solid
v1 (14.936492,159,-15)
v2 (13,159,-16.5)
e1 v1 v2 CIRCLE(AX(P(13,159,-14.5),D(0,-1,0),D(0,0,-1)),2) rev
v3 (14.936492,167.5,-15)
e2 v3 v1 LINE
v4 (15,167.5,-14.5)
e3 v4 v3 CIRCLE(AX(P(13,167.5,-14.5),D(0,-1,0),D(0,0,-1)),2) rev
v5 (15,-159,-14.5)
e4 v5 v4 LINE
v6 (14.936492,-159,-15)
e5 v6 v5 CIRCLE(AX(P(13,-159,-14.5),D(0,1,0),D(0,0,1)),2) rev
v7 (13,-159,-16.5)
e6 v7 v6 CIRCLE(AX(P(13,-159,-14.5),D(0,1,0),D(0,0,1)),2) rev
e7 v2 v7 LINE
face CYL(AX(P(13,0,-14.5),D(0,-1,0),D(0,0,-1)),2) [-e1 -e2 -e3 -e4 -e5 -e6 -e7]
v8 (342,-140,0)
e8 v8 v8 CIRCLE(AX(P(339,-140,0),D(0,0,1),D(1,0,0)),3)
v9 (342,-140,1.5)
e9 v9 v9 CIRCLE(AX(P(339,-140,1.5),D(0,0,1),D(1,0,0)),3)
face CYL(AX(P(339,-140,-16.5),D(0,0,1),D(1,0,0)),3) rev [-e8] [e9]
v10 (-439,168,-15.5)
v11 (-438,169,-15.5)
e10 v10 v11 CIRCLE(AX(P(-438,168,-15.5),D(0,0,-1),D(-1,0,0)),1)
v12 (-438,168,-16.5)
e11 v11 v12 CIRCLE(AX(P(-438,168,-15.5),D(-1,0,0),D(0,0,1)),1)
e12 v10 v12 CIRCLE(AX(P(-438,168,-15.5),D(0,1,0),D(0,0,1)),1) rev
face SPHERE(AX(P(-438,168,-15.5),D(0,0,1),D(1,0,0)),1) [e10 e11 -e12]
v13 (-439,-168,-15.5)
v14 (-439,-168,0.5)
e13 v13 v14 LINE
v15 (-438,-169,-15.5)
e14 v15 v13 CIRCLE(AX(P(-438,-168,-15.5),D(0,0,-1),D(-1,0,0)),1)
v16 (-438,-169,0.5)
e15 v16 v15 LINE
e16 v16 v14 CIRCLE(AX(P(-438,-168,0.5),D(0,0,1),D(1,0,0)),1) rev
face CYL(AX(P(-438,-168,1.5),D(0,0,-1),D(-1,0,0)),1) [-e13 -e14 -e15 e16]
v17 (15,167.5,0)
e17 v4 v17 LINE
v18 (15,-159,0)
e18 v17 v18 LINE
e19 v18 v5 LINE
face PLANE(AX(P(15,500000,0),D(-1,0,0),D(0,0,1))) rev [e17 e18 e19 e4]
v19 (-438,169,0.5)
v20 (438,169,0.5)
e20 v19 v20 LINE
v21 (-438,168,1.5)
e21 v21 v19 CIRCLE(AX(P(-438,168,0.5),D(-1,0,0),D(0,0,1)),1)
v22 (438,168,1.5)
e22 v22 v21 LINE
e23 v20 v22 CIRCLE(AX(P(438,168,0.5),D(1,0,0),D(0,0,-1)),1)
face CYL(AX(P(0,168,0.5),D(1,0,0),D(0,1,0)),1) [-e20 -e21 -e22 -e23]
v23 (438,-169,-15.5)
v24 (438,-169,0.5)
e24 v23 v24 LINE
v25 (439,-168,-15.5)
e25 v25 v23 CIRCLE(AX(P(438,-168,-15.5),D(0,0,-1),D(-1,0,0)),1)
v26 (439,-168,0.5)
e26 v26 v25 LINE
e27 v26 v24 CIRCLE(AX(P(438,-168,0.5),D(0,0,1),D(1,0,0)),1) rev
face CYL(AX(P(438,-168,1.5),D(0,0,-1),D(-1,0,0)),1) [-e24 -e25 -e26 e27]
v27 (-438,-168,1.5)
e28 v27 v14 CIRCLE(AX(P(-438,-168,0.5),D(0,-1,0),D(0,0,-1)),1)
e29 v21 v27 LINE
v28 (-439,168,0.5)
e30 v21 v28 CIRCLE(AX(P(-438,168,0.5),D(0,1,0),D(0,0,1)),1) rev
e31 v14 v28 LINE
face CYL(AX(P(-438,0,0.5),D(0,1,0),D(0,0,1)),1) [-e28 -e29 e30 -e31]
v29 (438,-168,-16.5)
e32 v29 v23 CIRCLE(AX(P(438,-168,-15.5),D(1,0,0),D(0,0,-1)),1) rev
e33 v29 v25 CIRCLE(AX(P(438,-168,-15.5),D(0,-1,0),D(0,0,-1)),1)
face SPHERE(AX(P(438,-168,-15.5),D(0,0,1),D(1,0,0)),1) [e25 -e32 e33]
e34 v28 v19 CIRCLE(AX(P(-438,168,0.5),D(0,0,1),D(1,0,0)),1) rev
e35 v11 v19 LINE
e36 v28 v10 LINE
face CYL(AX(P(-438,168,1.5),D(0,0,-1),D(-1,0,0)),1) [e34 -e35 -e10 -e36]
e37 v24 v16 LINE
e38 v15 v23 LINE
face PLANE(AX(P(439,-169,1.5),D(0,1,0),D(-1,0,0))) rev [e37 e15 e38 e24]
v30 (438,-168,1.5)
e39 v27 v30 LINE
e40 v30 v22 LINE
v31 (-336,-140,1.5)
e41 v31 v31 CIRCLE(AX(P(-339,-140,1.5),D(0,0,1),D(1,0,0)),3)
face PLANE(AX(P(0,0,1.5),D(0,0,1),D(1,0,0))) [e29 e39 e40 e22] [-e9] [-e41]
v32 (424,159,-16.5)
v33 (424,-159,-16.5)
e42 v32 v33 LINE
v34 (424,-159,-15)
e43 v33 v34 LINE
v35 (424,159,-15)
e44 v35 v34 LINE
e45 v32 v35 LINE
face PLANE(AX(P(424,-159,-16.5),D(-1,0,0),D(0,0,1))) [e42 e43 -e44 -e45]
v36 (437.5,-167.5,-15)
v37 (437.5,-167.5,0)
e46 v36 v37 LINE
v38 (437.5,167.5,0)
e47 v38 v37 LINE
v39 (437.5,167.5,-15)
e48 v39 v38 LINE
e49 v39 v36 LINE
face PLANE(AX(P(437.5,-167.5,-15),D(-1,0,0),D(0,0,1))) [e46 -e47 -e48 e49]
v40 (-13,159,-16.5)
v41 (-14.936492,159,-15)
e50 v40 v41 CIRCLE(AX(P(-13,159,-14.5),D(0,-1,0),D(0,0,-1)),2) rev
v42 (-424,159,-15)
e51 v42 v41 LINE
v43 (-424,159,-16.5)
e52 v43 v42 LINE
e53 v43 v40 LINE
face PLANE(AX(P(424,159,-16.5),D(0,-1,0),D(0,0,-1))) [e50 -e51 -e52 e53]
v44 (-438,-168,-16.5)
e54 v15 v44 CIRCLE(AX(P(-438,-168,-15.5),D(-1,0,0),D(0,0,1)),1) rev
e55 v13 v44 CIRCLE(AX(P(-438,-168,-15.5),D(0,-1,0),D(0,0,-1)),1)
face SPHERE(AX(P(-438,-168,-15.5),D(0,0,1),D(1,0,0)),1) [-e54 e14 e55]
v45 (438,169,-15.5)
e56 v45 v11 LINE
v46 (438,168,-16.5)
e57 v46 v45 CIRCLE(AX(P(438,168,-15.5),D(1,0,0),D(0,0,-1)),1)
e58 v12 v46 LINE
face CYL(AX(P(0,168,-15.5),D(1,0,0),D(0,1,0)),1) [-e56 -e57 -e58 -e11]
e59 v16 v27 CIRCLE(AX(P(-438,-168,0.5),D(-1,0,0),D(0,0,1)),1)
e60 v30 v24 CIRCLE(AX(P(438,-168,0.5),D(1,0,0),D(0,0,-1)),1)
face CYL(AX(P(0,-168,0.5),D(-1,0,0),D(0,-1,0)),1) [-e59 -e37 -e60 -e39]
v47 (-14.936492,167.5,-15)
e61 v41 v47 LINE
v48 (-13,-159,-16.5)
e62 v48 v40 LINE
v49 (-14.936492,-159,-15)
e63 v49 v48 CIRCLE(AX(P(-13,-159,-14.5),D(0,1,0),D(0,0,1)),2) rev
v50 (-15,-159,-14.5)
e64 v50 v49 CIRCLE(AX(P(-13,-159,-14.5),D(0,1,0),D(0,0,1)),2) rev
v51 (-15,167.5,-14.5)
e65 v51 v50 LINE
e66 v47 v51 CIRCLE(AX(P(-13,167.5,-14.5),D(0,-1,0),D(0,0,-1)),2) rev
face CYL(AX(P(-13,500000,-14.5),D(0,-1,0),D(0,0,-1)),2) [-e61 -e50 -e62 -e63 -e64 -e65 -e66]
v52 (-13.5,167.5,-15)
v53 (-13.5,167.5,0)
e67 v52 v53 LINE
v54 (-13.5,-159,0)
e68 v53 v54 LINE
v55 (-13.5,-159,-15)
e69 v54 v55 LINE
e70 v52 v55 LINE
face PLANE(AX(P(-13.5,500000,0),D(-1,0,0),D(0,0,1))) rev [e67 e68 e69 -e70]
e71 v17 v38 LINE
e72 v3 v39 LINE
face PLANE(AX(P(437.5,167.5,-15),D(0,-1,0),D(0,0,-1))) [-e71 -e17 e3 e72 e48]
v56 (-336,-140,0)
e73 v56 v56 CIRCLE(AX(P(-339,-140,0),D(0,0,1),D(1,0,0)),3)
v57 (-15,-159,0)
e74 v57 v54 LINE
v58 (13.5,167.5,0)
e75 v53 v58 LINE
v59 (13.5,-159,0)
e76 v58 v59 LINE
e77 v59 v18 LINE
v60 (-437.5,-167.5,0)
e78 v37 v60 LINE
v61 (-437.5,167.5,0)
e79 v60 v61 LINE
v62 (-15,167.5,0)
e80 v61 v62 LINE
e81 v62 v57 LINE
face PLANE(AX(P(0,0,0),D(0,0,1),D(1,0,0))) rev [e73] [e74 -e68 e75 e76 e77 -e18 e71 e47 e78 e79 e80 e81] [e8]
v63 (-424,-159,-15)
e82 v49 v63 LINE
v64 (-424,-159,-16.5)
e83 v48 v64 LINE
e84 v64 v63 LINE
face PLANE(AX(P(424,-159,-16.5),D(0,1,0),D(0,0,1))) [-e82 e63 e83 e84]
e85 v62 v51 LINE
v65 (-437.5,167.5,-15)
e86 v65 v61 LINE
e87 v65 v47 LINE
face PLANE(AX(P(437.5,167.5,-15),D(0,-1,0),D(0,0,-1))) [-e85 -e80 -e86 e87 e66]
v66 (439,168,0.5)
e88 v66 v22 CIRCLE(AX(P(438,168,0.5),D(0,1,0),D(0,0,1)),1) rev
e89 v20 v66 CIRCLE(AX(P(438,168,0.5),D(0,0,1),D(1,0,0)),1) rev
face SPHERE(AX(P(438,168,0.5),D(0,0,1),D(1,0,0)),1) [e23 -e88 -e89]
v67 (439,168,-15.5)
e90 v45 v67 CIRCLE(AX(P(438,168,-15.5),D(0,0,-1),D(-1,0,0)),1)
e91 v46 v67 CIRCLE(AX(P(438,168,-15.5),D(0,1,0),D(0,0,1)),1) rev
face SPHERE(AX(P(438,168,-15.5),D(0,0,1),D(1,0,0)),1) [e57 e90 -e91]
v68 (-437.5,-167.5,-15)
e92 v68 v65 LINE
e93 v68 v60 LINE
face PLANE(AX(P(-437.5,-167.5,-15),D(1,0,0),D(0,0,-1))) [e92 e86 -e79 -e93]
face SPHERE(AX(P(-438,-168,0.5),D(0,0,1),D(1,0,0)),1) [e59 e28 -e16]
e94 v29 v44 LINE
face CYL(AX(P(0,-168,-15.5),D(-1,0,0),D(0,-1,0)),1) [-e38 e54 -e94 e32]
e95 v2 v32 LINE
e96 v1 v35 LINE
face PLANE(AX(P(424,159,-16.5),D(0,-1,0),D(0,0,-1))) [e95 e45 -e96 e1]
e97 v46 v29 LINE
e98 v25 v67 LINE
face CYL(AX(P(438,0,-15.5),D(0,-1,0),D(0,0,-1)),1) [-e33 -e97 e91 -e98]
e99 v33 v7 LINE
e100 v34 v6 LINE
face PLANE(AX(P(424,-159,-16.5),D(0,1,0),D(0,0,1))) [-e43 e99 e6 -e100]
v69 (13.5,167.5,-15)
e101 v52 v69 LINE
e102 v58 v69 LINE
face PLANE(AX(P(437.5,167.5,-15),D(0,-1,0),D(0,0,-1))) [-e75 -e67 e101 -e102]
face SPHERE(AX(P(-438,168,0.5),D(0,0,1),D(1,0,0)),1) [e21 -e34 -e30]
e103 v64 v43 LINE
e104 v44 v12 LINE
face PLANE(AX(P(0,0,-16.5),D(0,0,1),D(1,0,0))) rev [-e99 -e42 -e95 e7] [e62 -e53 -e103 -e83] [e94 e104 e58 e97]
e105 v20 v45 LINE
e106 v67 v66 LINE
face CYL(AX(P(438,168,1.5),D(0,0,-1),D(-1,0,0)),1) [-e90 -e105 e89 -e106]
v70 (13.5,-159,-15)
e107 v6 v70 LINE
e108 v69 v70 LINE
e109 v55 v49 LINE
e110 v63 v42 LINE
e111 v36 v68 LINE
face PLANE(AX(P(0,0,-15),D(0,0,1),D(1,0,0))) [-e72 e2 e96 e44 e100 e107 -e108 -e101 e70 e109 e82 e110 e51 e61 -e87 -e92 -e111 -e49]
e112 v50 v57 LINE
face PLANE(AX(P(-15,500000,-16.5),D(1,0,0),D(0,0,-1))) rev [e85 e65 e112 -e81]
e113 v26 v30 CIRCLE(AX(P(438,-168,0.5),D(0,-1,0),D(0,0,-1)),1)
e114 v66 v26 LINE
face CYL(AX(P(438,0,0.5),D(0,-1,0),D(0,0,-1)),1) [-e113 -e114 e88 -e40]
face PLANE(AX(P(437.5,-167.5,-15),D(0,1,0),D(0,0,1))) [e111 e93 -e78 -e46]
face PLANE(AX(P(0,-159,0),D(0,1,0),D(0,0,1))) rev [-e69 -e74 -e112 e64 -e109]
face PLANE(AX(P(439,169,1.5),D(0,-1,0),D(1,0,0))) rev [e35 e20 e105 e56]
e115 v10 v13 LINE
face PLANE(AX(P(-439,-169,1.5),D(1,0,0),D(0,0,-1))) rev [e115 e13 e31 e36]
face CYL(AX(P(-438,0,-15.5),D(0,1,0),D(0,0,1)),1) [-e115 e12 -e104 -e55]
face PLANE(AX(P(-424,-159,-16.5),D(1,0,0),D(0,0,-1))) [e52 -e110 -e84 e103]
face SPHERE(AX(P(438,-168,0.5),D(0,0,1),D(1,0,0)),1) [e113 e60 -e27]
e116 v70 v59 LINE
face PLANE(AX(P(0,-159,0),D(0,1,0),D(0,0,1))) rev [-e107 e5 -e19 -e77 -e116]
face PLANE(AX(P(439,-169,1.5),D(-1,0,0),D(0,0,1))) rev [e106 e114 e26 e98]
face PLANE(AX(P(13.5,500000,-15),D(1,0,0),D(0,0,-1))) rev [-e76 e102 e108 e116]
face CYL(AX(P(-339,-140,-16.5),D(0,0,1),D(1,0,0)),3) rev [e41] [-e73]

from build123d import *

# Parameters (mm, degrees)
SKETCH_1_W          = 878
SKETCH_1_H          = 338
EXTRUDE_1_DEPTH     = 1.5
SKETCH_2_W          = 878
SKETCH_2_H          = 338
SKETCH_2_W_2        = 875
SKETCH_2_H_2        = 335
EXTRUDE_2_DEPTH     = 15
SKETCH_3_W          = 878
SKETCH_3_H          = 338
SKETCH_3_W_2        = 848
SKETCH_3_H_2        = 318
EXTRUDE_3_DEPTH     = 1.5
SKETCH_6_R          = 3
CUT_EXTRUDE_1_DEPTH = 471.750464684
FILLET_1_R          = 1
EXTRUDE_5_REACH     = 550.249
FILLET_START        = -159
FILLET_2_DEPTH      = 318
FILLET_START_2      = 133.01507
FILLET_2_2_DEPTH    = 34.48493


with BuildPart() as part:
    # 草图1 → 凸台-拉伸1 (new body)
    with BuildSketch(Plane.XY):
        Rectangle(SKETCH_1_W, SKETCH_1_H)
    extrude(amount=EXTRUDE_1_DEPTH)

    # 草图2 → 凸台-拉伸2 (add)
    with BuildSketch(Plane(origin=(0, 0, 0), x_dir=(-1, 0, 0), z_dir=(0, 0, -1))):
        Rectangle(SKETCH_2_W, SKETCH_2_H)
        Rectangle(SKETCH_2_W_2, SKETCH_2_H_2, mode=Mode.SUBTRACT)
    extrude(amount=EXTRUDE_2_DEPTH)

    # 草图3 → 凸台-拉伸3 (add)
    with BuildSketch(Plane(origin=(0, 0, -15), x_dir=(-1, 0, 0), z_dir=(0, 0, -1))):
        Rectangle(SKETCH_3_W, SKETCH_3_H)
        Rectangle(SKETCH_3_W_2, SKETCH_3_H_2, mode=Mode.SUBTRACT)
    extrude(amount=EXTRUDE_3_DEPTH)

    # 草图6 → 切除-拉伸1 (cut, through all)
    with BuildSketch(Plane.XY.offset(1.5)):
        with Locations((-339, -140)):
            Circle(SKETCH_6_R)
        with Locations((339, -140)):
            Circle(SKETCH_6_R)
    extrude(amount=-CUT_EXTRUDE_1_DEPTH, mode=Mode.SUBTRACT)

    # 圆角1
    fillet_1_edges = [part.edges().sort_by_distance(p)[0] for p in [
        (439, 0, 1.5),
        (0, 169, 1.5),
        (-439, 0, -16.5),
        (0, 169, -16.5),
        (439, 0, -16.5),
        (0, -169, -16.5),
        (-439, 0, 1.5),
        (0, -169, 1.5),
        (-439, 169, -7.5),
        (439, 169, -7.5),
        (439, -169, -7.5),
        (-439, -169, -7.5),
    ]]
    fillet(fillet_1_edges, radius=FILLET_1_R)

    # 草图9 → 凸台-拉伸5 (add, up to next)
    with BuildSketch(Plane(origin=(0, -159, 0), x_dir=(1, 0, 0), z_dir=(0, 1, 0)), mode=Mode.PRIVATE) as extrude_5_sk1:
        Polygon((15, 0), (15, 16.5), (-15, 16.5), (-15, 0), (-13.5, 0), (-13.5, 15), (13.5, 15), (13.5, 0), align=None)
    extrude_5_tool1 = extrude(extrude_5_sk1.sketch, amount=EXTRUDE_5_REACH, mode=Mode.PRIVATE) - part.part
    add(extrude_5_tool1.solids().sort_by_distance((14.657619, -159, -8.25))[0])

    # 圆角2: read off the stored shape, not the designer's step
    # 圆角2 outline → 圆角2 (cut)
    with BuildSketch(Plane(origin=(0, 0, 0), x_dir=(1, 0, 0), z_dir=(0, 1, 0)).offset(FILLET_START)):
        with BuildLine():
            ThreePointArc((-15, 14.5), (-14.414213562, 15.914213562), (-13, 16.5))
            Line((-13, 16.5), (-15, 16.5))
            Line((-15, 16.5), (-15, 14.5))
        make_face()
        with BuildLine():
            Line((15, 14.5), (15, 16.5))
            Line((15, 16.5), (13, 16.5))
            ThreePointArc((13, 16.5), (14.414213562, 15.914213562), (15, 14.5))
        make_face()
    extrude(amount=FILLET_2_DEPTH, mode=Mode.SUBTRACT)

    # Fillet 2 2 outline → Fillet 2 2 (cut)
    with BuildSketch(Plane(origin=(0, 0, 0), x_dir=(1, 0, 0), z_dir=(0, 1, 0)).offset(FILLET_START_2)):
        with BuildLine():
            Line((-15, 15), (-15, 14.5))
            ThreePointArc((-15, 14.5), (-14.984059392, 14.752008585), (-14.936491673, 15))
            Line((-14.936491673, 15), (-15, 15))
        make_face()
        with BuildLine():
            Line((15, 15), (14.936491673, 15))
            ThreePointArc((14.936491673, 15), (14.984059392, 14.752008585), (15, 14.5))
            Line((15, 14.5), (15, 15))
        make_face()
    extrude(amount=FILLET_2_2_DEPTH, mode=Mode.SUBTRACT)


solid = part.part
